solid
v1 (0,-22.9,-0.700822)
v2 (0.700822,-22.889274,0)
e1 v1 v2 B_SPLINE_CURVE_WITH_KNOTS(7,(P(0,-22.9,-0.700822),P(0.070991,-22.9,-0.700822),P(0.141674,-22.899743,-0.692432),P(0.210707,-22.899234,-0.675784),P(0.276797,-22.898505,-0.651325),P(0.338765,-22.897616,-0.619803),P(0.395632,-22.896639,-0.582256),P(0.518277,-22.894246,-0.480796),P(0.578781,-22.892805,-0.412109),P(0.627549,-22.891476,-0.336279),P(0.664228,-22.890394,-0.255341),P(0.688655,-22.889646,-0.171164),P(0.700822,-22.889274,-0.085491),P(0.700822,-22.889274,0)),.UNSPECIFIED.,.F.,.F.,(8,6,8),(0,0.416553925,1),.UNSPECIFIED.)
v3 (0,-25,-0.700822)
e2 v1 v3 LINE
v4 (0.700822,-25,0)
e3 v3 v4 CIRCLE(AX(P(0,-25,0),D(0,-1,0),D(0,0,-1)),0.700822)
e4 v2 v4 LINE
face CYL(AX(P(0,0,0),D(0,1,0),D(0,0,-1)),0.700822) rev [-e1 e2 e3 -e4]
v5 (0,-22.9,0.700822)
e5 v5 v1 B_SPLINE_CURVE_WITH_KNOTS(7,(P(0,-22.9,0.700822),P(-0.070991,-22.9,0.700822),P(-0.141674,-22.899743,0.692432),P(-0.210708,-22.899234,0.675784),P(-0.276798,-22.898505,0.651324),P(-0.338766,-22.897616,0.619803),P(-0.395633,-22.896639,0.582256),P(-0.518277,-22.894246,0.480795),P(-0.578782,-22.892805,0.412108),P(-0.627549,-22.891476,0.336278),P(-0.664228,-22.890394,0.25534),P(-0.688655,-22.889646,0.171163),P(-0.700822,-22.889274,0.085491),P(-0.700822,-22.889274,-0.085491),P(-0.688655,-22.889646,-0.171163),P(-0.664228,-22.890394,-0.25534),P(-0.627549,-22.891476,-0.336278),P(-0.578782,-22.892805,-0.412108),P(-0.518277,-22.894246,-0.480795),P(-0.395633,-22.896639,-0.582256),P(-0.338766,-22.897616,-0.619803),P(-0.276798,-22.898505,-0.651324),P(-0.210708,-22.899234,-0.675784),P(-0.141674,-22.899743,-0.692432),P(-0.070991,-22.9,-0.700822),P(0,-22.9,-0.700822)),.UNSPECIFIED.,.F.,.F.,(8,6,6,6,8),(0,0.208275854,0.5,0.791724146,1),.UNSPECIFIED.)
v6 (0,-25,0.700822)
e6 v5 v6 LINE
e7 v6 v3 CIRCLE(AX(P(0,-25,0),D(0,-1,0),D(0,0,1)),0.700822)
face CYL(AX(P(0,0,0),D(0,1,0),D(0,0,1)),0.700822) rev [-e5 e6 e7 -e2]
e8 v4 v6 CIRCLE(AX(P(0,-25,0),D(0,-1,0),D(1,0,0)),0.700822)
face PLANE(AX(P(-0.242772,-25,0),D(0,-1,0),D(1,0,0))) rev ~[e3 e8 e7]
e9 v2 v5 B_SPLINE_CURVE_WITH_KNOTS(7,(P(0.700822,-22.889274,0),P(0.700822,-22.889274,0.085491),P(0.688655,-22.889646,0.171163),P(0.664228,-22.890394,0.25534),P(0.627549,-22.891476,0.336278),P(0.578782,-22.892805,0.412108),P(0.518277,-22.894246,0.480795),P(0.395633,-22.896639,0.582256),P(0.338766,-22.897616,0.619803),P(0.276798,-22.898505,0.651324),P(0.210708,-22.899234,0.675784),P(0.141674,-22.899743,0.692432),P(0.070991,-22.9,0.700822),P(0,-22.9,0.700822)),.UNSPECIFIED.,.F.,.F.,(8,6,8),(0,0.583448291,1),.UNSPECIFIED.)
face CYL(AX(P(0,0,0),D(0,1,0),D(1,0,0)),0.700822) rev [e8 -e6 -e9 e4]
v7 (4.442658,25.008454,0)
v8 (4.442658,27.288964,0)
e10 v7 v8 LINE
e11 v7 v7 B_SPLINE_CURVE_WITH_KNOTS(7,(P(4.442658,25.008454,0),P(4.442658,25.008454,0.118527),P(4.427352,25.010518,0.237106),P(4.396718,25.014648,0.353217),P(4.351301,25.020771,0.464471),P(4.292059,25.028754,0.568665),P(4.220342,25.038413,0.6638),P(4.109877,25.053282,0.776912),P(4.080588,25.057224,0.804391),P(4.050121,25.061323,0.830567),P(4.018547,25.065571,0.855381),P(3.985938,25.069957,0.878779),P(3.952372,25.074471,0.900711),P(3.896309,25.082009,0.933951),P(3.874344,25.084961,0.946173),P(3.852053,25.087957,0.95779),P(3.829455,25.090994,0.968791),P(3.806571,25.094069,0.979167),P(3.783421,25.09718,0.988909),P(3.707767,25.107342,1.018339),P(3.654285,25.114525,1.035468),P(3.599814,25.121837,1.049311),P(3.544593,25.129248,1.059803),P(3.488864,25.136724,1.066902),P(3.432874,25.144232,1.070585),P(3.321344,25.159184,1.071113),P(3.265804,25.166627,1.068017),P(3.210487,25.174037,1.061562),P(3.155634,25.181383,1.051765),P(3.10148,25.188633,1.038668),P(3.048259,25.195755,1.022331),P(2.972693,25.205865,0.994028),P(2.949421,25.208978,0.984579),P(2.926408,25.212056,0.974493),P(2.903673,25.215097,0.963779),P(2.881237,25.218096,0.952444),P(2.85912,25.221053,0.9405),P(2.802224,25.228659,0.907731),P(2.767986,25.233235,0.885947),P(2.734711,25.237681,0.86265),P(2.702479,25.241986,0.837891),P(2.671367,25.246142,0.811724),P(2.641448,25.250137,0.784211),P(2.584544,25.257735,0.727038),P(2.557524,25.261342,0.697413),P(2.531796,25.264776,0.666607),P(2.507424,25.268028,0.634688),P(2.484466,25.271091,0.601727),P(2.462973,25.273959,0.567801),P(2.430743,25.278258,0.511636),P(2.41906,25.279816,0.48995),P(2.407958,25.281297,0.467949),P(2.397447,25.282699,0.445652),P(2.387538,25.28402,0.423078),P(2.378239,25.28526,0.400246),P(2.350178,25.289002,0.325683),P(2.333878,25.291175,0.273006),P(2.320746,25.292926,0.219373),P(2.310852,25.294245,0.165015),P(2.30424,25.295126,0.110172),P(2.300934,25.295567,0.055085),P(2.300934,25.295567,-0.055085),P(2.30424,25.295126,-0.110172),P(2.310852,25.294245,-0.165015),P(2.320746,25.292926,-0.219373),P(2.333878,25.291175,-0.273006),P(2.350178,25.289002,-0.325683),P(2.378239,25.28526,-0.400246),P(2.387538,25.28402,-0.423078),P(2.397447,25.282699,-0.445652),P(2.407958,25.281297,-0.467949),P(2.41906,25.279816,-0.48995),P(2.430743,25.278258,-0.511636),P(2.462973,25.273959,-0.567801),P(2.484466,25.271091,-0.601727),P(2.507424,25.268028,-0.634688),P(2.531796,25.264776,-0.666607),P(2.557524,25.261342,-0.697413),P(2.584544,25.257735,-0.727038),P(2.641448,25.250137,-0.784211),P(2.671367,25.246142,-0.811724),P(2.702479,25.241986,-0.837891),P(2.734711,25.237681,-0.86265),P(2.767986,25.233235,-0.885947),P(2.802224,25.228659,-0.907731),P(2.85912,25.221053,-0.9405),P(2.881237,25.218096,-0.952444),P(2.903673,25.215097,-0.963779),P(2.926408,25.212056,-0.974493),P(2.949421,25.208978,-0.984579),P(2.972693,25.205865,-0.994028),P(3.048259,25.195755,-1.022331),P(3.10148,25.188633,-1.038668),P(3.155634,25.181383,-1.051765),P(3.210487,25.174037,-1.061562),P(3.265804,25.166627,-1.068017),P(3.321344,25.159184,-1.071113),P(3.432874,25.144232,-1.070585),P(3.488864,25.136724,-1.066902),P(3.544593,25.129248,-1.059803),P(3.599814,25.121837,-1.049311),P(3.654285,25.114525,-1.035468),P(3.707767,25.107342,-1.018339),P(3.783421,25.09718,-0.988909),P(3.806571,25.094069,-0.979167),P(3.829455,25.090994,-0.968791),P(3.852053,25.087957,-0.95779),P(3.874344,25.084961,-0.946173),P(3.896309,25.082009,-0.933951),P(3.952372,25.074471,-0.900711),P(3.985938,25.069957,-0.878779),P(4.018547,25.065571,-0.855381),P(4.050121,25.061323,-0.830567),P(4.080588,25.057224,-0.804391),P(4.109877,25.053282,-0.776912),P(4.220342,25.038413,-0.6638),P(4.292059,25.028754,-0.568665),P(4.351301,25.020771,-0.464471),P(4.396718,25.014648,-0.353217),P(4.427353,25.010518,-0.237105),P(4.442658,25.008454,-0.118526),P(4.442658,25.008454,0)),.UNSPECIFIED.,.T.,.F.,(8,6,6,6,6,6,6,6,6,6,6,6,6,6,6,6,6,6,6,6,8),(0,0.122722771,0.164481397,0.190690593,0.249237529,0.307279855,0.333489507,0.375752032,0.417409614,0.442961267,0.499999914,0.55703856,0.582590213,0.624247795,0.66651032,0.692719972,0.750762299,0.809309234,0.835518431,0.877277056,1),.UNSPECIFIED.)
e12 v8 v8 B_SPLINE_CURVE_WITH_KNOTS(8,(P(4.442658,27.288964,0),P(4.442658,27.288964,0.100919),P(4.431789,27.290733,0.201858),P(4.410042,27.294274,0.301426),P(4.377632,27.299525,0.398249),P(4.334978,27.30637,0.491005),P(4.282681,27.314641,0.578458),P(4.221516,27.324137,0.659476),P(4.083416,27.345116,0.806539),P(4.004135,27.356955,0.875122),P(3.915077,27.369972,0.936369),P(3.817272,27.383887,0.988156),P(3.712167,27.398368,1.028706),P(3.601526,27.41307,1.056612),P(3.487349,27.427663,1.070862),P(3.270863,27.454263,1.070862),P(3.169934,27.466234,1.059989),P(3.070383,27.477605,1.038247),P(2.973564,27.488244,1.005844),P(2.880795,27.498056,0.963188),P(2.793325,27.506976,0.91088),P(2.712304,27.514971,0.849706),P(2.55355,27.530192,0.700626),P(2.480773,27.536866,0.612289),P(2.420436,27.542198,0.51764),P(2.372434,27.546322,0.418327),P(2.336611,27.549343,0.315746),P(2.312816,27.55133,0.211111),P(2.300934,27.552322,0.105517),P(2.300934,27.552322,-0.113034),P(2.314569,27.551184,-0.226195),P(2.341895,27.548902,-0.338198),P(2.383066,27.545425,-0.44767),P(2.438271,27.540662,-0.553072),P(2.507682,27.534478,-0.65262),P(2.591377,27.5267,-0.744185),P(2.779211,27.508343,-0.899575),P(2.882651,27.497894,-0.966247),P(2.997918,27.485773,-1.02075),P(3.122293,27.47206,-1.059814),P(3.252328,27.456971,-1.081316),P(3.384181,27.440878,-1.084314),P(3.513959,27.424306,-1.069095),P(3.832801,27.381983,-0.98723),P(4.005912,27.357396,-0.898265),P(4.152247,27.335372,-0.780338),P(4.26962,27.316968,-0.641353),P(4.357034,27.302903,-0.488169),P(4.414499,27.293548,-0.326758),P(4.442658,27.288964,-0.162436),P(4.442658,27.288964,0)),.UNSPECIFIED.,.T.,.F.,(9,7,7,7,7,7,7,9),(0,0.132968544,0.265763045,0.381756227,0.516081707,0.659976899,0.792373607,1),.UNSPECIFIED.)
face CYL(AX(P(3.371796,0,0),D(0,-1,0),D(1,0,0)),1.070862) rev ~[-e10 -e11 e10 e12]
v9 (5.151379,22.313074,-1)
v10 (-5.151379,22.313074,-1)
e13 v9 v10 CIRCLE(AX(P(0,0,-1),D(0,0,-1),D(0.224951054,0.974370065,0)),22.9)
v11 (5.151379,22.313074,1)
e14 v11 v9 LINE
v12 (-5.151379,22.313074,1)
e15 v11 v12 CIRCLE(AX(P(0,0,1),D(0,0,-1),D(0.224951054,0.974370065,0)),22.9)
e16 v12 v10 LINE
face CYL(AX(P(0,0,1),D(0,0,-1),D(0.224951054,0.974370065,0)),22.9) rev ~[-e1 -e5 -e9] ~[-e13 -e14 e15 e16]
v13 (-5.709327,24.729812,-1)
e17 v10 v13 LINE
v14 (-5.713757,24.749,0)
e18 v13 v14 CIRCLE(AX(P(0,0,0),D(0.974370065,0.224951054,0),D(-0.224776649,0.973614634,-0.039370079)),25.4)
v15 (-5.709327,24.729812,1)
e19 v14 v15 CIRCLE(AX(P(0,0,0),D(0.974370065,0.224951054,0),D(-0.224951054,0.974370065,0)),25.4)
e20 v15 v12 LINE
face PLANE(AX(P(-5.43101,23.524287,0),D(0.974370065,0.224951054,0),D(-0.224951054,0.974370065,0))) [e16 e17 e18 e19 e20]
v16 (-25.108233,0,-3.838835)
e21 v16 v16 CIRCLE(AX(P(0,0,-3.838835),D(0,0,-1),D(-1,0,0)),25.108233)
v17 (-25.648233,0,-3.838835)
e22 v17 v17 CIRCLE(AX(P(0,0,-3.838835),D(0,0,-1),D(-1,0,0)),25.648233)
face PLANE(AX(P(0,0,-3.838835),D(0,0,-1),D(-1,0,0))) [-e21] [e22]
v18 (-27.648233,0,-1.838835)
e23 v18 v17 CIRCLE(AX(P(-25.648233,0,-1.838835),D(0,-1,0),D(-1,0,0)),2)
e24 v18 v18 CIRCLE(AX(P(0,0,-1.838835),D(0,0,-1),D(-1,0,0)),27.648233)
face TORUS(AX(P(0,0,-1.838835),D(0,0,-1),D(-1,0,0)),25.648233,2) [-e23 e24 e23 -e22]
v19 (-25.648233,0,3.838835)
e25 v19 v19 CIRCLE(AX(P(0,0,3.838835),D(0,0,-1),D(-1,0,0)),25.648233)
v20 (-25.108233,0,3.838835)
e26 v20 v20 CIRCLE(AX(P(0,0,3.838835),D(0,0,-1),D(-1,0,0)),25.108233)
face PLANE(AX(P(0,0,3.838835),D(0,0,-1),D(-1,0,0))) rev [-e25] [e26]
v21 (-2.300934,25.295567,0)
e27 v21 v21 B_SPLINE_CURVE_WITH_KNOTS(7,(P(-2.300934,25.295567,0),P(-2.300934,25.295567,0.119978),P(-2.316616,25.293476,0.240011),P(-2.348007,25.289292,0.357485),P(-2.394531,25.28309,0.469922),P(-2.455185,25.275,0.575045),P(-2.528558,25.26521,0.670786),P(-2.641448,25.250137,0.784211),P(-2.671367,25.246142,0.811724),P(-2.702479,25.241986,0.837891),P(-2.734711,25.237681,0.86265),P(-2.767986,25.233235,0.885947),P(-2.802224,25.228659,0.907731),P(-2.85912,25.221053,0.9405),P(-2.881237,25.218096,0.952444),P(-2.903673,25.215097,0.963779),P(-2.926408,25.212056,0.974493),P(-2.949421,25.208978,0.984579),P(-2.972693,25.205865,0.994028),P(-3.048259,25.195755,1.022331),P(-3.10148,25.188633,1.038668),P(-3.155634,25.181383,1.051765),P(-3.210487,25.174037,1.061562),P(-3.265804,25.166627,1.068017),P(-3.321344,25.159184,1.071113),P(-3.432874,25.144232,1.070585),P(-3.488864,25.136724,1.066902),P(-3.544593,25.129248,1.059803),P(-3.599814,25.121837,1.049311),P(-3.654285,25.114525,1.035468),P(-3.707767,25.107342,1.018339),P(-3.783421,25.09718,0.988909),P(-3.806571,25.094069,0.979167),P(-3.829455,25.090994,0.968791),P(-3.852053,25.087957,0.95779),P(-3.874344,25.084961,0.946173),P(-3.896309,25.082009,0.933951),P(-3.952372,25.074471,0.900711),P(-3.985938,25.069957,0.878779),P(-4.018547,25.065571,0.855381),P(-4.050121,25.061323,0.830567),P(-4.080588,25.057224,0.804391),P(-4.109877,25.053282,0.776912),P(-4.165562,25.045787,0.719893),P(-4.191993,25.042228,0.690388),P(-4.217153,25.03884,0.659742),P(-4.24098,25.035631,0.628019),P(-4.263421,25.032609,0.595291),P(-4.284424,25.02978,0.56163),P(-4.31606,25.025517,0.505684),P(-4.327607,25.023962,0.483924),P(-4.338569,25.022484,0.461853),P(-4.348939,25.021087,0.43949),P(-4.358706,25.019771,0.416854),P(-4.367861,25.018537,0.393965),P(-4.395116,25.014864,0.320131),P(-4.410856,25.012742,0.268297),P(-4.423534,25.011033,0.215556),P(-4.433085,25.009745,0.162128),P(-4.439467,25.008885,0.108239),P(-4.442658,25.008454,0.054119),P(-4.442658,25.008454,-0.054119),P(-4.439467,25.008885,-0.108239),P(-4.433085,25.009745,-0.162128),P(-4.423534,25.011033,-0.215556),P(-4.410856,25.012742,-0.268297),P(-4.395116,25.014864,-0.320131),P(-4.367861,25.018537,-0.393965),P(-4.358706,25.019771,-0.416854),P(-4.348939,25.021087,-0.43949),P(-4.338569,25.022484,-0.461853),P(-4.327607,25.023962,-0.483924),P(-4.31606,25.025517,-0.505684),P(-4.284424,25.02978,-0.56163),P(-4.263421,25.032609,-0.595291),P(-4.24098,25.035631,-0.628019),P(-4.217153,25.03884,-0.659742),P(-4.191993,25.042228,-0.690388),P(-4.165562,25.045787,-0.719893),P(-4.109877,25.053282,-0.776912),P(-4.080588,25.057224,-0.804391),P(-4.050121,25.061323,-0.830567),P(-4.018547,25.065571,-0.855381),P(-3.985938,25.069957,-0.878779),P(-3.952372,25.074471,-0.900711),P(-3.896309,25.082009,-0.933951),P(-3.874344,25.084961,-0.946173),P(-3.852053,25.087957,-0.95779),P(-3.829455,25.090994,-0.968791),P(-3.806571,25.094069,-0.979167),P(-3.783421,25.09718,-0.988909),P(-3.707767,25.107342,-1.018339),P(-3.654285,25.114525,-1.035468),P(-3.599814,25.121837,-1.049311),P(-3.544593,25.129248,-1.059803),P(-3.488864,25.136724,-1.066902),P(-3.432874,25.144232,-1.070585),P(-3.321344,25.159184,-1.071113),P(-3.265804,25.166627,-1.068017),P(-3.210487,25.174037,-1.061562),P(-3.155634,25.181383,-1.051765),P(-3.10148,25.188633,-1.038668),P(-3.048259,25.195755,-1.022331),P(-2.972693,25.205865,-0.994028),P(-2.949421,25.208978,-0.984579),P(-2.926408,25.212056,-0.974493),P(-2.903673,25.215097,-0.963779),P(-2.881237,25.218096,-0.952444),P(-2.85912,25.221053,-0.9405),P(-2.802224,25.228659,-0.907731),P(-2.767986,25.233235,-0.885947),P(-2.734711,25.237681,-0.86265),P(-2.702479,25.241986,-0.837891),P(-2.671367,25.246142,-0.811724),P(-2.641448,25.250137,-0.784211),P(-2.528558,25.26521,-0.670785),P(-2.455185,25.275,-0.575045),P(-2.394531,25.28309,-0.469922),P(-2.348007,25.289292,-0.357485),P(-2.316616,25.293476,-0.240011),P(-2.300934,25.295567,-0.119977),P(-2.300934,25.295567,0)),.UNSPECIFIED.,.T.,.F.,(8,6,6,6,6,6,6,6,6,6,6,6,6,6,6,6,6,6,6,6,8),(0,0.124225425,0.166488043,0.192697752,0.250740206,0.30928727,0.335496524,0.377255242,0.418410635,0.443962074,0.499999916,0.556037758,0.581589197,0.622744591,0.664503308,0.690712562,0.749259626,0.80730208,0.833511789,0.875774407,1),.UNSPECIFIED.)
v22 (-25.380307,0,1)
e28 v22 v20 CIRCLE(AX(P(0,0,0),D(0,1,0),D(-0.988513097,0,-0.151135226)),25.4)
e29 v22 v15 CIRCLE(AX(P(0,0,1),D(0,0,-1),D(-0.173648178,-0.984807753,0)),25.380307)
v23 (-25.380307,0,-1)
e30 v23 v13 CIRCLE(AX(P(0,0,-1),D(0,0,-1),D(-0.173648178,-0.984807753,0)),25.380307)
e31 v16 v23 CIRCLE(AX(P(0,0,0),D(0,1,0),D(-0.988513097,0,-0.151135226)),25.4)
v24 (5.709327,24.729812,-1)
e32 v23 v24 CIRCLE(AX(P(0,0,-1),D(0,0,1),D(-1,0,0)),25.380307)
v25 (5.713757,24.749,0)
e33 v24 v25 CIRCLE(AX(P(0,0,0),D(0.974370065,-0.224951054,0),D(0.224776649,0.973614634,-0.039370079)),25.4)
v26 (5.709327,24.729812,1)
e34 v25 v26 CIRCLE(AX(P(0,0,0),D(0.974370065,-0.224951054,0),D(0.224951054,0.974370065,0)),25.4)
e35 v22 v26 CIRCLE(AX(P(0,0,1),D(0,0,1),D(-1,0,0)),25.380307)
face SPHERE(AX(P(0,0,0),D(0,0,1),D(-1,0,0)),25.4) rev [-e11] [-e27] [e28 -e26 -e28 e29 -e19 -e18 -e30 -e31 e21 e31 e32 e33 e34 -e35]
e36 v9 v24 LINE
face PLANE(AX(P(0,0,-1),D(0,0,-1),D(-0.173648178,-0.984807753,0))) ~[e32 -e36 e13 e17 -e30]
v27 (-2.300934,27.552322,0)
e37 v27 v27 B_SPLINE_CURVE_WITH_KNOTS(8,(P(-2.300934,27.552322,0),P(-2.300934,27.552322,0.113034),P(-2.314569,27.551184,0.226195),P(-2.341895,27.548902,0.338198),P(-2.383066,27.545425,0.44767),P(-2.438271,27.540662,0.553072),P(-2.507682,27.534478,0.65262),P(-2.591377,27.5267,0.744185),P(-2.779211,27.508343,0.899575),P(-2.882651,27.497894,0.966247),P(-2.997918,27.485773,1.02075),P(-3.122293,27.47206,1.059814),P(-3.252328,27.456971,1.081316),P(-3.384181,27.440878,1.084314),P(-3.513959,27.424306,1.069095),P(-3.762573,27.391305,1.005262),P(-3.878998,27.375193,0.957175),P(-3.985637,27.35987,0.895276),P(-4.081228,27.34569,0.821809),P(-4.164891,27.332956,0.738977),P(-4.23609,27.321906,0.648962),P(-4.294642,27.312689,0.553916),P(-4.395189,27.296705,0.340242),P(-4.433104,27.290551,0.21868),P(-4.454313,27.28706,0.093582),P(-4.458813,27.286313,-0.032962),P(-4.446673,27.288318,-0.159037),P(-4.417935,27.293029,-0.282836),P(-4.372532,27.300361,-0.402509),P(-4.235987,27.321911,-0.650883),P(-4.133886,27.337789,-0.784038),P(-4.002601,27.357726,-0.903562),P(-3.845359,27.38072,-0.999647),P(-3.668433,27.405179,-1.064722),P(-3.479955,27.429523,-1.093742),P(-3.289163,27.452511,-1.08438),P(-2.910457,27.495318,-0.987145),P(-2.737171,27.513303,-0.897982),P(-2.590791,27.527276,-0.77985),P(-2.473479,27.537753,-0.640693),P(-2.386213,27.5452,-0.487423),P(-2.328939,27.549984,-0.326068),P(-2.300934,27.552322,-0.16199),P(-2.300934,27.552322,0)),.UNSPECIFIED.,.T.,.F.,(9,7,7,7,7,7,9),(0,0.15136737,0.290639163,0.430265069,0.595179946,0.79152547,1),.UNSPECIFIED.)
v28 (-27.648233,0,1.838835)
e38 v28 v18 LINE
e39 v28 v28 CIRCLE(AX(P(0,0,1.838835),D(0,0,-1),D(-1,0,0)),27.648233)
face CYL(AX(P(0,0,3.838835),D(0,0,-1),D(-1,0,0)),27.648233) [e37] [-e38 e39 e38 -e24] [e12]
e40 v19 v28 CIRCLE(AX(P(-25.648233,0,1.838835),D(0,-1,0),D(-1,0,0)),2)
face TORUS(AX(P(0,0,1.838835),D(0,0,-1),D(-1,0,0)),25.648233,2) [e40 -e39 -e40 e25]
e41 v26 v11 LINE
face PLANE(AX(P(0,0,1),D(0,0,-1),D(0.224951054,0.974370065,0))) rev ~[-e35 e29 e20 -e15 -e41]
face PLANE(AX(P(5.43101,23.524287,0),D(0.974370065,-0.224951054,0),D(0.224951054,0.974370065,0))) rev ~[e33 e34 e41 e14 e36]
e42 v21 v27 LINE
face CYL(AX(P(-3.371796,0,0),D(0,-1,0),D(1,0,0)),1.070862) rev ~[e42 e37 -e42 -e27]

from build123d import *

# Parameters (mm, degrees)
F5_R           = 2
F1_R           = 1.0708620531
F6_DEPTH       = 43.9
F7_ANGLE_START = 100
F7_ANGLE       = 157
F8_ANGLE_BACK  = 77
F8_ANGLE       = 177
F9_DEPTH       = 25


with BuildPart() as f2:
    # F1 (on Front) → F2 (revolve)
    with BuildSketch(Plane.XZ):
        with BuildLine():
            ThreePointArc((-25.1082326719, -3.8388347315), (-25.4, 0), (-25.1082326719, 3.8388347315))
            Line((-25.1082326719, 3.8388347315), (-27.6482326719, 3.8388347315))
            Line((-27.6482326719, 3.8388347315), (-27.6482326719, -3.8388347315))
            Line((-27.6482326719, -3.8388347315), (-25.1082326719, -3.8388347315))
        make_face()
    revolve(axis=Axis((0, 0, 0.0089984387), (0, 0, -1)))

    # F5
    f5_edges = [f2.edges().sort_by_distance(p)[0] for p in [
        (27.648233, 0, 3.838835),
        (27.648233, 0, -3.838835),
    ]]
    fillet(f5_edges, radius=F5_R)

    # F1 (on Front) → F6 (cut)
    with BuildSketch(Plane.XZ):
        with Locations((3.3717958722, 0)):
            Circle(F1_R)
        with Locations((-3.3717958722, 0)):
            Circle(F1_R)
    extrude(amount=-F6_DEPTH, mode=Mode.SUBTRACT)

    # F1 (on Front) → F7 (revolve)
    with BuildSketch(Plane.XZ, mode=Mode.PRIVATE) as f7_sk:
        with BuildLine():
            ThreePointArc((25.3803073267, -1), (25.3950763545, -0.5000969409), (25.4, 0))
            ThreePointArc((25.4, 0), (25.3950763545, 0.5000969409), (25.3803073267, 1))
            Line((25.3803073267, 1), (22.9, 1))
            Line((22.9, 1), (22.9, -1))
            Line((22.9, -1), (25.3803073267, -1))
        make_face()
    revolve(f7_sk.sketch.rotate(Axis((0, 0, 0.0089984387), (0, 0, -1)), F7_ANGLE_START), axis=Axis((0, 0, 0.0089984387), (0, 0, -1)), revolution_arc=F7_ANGLE)

    # F1 (on Front) → F8 (revolve)
    with BuildSketch(Plane.XZ, mode=Mode.PRIVATE) as f8_sk:
        with BuildLine():
            ThreePointArc((25.3803073267, -1), (25.3950763545, -0.5000969409), (25.4, 0))
            ThreePointArc((25.4, 0), (25.3950763545, 0.5000969409), (25.3803073267, 1))
            Line((25.3803073267, 1), (22.9, 1))
            Line((22.9, 1), (22.9, -1))
            Line((22.9, -1), (25.3803073267, -1))
        make_face()
    revolve(f8_sk.sketch.rotate(Axis((0, 0, 0.0089984387), (0, 0, -1)), -F8_ANGLE_BACK), axis=Axis((0, 0, 0.0089984387), (0, 0, -1)), revolution_arc=F8_ANGLE)

    # F1 (on Front) → F9 (cut)
    with BuildSketch(Plane.XZ):
        with BuildLine():
            Line((0, -0.700821599), (0, 0.700821599))
            ThreePointArc((0, 0.700821599), (-0.700821599, 0), (0, -0.700821599))
        make_face()
        with BuildLine():
            ThreePointArc((0.700821599, 0), (0.4955557051, 0.4955557051), (0, 0.700821599))
            Line((0, 0.700821599), (0, -0.700821599))
            ThreePointArc((0, -0.700821599), (0.4955557051, -0.4955557051), (0.700821599, 0))
        make_face()
    extrude(amount=F9_DEPTH, mode=Mode.SUBTRACT)


solid = f2.part
